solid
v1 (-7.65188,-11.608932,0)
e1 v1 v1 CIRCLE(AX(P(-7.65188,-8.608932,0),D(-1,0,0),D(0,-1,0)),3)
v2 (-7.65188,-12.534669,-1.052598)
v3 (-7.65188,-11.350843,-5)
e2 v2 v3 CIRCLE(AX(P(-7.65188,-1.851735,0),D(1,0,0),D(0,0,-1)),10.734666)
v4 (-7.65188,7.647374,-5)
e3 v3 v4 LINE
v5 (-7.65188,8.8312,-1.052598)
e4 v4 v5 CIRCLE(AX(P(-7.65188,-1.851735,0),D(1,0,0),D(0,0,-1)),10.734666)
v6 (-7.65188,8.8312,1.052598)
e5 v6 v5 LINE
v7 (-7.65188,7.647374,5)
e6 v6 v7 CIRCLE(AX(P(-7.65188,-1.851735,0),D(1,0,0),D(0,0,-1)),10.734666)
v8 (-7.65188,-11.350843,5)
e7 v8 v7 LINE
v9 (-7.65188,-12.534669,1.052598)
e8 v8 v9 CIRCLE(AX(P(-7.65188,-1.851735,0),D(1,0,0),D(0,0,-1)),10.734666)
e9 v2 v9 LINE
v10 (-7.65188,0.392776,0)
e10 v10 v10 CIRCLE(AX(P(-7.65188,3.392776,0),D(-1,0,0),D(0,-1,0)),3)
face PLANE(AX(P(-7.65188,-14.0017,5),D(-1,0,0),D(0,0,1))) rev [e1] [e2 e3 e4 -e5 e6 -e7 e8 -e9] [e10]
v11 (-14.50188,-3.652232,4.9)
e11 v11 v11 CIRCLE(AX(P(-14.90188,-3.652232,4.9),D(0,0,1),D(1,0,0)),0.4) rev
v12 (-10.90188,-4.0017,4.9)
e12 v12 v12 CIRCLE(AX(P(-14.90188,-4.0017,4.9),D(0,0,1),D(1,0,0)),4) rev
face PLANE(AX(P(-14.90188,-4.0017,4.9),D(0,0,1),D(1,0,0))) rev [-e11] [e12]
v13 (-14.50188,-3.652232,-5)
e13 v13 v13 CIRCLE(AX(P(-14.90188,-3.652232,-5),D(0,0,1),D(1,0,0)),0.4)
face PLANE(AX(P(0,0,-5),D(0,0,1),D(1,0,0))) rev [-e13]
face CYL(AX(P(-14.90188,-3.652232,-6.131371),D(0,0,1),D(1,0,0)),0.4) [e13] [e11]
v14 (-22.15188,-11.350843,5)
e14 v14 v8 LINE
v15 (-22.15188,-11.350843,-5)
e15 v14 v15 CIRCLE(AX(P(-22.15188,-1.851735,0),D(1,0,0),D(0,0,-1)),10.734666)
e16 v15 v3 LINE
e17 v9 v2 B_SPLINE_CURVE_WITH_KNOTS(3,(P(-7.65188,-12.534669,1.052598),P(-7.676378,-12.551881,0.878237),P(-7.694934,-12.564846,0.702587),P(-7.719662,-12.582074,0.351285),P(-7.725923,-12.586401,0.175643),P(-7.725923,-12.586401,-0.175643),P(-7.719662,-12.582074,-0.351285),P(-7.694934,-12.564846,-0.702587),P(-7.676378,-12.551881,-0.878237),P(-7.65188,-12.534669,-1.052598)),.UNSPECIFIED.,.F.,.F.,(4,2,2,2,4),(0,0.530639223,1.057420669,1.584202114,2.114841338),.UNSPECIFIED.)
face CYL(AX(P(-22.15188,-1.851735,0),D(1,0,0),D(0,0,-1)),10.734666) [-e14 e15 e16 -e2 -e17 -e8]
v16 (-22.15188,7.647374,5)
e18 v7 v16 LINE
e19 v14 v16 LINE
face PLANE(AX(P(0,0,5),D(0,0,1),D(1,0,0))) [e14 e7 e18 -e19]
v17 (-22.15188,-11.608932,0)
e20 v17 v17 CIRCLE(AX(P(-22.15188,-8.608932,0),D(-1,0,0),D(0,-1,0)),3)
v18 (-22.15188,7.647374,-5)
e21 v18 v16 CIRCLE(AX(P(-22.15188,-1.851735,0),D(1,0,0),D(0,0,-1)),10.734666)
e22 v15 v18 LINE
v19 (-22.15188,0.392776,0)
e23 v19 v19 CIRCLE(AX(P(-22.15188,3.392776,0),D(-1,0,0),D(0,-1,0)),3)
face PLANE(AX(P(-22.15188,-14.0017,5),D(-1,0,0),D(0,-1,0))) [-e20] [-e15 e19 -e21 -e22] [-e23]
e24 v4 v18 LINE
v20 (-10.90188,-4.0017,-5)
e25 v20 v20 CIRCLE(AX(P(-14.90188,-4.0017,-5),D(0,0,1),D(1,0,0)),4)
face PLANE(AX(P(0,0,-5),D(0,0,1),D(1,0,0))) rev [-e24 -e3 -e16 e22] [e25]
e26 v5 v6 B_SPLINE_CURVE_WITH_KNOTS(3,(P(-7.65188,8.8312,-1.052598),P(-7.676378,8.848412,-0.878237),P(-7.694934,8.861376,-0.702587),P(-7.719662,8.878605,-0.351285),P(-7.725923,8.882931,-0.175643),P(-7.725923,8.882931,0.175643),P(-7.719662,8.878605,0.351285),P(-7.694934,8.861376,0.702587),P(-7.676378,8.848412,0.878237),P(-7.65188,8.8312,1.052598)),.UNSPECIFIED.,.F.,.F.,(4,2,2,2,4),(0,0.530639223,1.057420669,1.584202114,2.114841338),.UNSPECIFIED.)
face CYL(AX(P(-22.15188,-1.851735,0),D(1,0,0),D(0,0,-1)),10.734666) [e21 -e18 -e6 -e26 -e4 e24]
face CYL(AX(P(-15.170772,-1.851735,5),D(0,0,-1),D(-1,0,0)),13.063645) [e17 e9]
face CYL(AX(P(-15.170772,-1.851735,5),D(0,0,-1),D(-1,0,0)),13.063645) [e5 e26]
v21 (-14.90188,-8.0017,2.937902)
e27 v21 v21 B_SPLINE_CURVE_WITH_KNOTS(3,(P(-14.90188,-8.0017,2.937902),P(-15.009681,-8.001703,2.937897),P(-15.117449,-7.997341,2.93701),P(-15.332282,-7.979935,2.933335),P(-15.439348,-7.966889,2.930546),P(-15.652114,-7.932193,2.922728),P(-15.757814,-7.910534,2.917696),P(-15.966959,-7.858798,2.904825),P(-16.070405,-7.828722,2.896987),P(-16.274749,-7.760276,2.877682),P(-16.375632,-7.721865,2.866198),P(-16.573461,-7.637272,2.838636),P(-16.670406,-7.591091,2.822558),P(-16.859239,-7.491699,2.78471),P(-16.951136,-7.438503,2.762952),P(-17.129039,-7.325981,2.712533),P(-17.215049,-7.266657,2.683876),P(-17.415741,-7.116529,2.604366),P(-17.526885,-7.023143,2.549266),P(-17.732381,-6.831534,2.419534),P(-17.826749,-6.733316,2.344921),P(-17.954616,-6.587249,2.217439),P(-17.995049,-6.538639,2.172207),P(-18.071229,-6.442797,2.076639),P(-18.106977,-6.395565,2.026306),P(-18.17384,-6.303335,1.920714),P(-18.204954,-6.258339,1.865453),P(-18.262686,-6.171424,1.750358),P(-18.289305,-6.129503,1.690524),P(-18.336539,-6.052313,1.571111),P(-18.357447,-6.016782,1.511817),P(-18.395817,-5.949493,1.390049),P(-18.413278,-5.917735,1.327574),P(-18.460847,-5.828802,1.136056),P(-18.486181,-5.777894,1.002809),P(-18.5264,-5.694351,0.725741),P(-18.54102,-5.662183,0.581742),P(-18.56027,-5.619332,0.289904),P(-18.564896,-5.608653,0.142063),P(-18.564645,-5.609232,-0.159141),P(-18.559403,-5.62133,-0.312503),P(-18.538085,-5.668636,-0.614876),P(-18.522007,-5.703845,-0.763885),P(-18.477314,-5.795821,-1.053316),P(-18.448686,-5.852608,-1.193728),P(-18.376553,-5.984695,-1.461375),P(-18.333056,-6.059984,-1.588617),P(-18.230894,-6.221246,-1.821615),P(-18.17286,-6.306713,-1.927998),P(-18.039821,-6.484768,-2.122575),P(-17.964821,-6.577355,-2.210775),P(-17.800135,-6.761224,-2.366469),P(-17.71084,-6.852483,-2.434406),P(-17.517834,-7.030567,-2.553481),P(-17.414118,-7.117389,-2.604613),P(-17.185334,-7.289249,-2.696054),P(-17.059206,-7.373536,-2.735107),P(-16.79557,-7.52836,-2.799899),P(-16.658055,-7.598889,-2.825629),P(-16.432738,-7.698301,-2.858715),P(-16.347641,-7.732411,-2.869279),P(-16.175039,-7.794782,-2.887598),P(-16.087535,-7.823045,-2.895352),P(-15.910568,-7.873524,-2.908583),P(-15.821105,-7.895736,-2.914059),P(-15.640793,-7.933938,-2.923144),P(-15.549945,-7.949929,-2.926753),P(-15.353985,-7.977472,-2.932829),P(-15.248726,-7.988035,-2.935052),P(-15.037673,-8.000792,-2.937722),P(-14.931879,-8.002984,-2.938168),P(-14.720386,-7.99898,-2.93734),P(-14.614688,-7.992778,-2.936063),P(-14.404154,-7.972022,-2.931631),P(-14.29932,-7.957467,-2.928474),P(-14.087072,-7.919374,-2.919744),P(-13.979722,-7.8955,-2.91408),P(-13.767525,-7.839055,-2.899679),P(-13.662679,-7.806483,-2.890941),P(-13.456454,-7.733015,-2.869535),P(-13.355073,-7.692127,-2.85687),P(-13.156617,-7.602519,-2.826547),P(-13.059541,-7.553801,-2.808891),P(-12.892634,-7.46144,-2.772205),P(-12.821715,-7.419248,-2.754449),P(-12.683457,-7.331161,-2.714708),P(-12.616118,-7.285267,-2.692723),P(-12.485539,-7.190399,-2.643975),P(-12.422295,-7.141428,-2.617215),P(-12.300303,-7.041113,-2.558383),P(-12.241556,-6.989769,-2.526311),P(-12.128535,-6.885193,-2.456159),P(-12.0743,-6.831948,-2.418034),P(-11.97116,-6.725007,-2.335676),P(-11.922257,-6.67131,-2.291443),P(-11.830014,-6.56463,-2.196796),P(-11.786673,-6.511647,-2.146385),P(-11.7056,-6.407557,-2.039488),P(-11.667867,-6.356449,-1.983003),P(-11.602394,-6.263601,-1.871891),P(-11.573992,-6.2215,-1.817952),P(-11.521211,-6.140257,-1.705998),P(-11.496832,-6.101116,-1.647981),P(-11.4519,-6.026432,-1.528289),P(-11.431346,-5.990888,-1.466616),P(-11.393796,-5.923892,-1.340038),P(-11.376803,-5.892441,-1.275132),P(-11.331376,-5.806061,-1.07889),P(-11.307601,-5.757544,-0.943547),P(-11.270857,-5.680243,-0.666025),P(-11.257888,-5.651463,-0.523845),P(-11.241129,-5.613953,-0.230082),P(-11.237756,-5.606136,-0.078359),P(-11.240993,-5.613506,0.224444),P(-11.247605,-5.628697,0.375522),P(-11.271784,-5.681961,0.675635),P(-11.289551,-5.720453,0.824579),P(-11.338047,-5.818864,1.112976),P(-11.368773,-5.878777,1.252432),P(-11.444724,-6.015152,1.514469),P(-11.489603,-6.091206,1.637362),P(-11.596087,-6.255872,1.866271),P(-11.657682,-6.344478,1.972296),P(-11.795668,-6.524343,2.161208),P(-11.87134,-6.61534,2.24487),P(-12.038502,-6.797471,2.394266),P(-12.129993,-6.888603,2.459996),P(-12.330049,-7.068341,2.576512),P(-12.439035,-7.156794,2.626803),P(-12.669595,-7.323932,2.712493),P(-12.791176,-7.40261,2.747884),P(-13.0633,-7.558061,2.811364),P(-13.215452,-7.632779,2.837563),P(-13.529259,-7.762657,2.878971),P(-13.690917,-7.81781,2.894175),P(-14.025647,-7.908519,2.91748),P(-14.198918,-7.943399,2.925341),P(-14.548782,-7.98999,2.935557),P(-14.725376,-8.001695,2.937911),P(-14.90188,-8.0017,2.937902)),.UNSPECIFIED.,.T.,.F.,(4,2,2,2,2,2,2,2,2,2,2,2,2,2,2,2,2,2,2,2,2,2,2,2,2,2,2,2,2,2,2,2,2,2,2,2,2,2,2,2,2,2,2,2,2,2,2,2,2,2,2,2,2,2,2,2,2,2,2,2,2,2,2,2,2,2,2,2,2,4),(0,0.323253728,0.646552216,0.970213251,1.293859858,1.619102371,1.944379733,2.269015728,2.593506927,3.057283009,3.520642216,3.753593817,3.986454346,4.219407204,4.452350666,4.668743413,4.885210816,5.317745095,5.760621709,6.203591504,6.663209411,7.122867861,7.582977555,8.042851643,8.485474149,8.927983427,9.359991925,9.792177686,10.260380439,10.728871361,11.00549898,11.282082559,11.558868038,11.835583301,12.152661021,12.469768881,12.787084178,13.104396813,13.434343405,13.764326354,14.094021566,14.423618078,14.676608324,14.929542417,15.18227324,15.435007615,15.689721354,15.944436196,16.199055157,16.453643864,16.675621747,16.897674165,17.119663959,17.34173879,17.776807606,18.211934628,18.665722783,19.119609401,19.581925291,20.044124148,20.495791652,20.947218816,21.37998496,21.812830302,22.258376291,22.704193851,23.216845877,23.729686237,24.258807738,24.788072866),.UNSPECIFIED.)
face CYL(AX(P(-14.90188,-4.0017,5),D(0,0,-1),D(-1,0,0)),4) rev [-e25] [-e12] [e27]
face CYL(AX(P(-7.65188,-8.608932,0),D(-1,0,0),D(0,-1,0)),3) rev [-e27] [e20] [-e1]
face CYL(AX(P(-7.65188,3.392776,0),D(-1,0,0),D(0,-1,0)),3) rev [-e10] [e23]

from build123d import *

# Parameters (mm, degrees)
SKETCH1_W               = 14.5
SKETCH1_H               = 30
SKETCH1_R               = 3
BOSS_EXTRUDE1_DEPTH     = 5
CUT_EXTRUDE1_DEPTH      = 30.097274604
CUT_EXTRUDE1_DEPTH_BACK = 30.097274604
SKETCH2_R               = 4
CUT_EXTRUDE2_DEPTH      = 23.16293341
CUT_EXTRUDE2_DEPTH_BACK = 23.16293341
SKETCH3_R               = 3
CUT_EXTRUDE3_DEPTH      = 23.162933498
CUT_EXTRUDE3_DEPTH_BACK = 23.162933498
SKETCH4_R               = 3
BOSS_EXTRUDE5_START     = -10
SKETCH6_R               = 5
BOSS_EXTRUDE5_DEPTH     = 0.1
SKETCH7_R               = 0.4
BOSS_EXTRUDE6_DEPTH     = 9.9
SKETCH8_W               = 10
SKETCH8_H               = 5.416493121
CUT_EXTRUDE5_DEPTH      = 23.162933498
CUT_EXTRUDE6_START      = -10
CUT_EXTRUDE6_DEPTH      = 10
CUT_EXTRUDE7_START      = -14.5
CUT_EXTRUDE7_DEPTH      = 14.5


# Read off the part's stored shape, not the designer's step: Cut-Extrude6, Cut-Extrude7
with BuildPart() as part:
    # Sketch1 → Boss-Extrude1 (new, symmetric)
    with BuildSketch(Plane.XY):
        with Locations((-14.901879651, 0.998300452)):
            Rectangle(SKETCH1_W, SKETCH1_H)
        with Locations((-14.901879651, -4.732232083)):
            Circle(SKETCH1_R, mode=Mode.SUBTRACT)
    extrude(amount=BOSS_EXTRUDE1_DEPTH, both=True)

    # Sketch2 → Cut-Extrude1 (cut, two sides: drawn at the far end of the back side and taken through both)
    with BuildSketch(Plane(origin=(0, 0, -5), x_dir=(-1, 0, 0), z_dir=(0, 0, -1)).offset(-CUT_EXTRUDE1_DEPTH_BACK)):
        with Locations((14.901879651, -4.001699548)):
            Circle(SKETCH2_R)
    extrude(amount=CUT_EXTRUDE1_DEPTH + CUT_EXTRUDE1_DEPTH_BACK, mode=Mode.SUBTRACT)

    # Sketch3 → Cut-Extrude2 (cut, two sides: drawn at the far end of the back side and taken through both)
    with BuildSketch(Plane.ZY.offset(22.151879651).offset(-CUT_EXTRUDE2_DEPTH_BACK)):
        with Locations(Location((0, -8.608931628, 0), (0, 0, 270))):
            Circle(SKETCH3_R)
    extrude(amount=CUT_EXTRUDE2_DEPTH + CUT_EXTRUDE2_DEPTH_BACK, mode=Mode.SUBTRACT)

    # Sketch4 → Cut-Extrude3 (cut, two sides: drawn at the far end of the back side and taken through both)
    with BuildSketch(Plane.ZY.offset(22.151879651).offset(-CUT_EXTRUDE3_DEPTH_BACK)):
        with Locations(Location((0, 3.392776132, 0), (0, 0, 270))):
            Circle(SKETCH4_R)
    extrude(amount=CUT_EXTRUDE3_DEPTH + CUT_EXTRUDE3_DEPTH_BACK, mode=Mode.SUBTRACT)

    # Sketch6 → Boss-Extrude5 (add)
    with BuildSketch(Plane(origin=(0, 0, -5), x_dir=(-1, 0, 0), z_dir=(0, 0, -1)).offset(BOSS_EXTRUDE5_START)):
        with Locations((14.901879651, -4.001699548)):
            Circle(SKETCH6_R)
    extrude(amount=BOSS_EXTRUDE5_DEPTH)

    # Sketch7 → Boss-Extrude6 (add)
    with BuildSketch(Plane(origin=(0, 0, 4.9), x_dir=(-1, 0, 0), z_dir=(0, 0, -1))):
        with Locations(Location((14.901879651, -3.652232083, 0), (0, 0, 180))):
            Circle(SKETCH7_R)
    extrude(amount=BOSS_EXTRUDE6_DEPTH)

    # Sketch8 → Cut-Extrude5 (cut, through all)
    with BuildSketch(Plane(origin=(-7.651879651, 0, 0), x_dir=(0, 0, -1), z_dir=(1, 0, 0))):
        with Locations((0, 13.290053892)):
            Rectangle(SKETCH8_W, SKETCH8_H)
    extrude(amount=-CUT_EXTRUDE5_DEPTH, mode=Mode.SUBTRACT)

    # Cut-Extrude6 outline → Cut-Extrude6 (cut)
    with BuildSketch(Plane(origin=(0, 0, -5), x_dir=(-1, 0, 0), z_dir=(0, 0, -1)).offset(CUT_EXTRUDE6_START)):
        with BuildLine():
            ThreePointArc((7.651879651, 8.831200001), (9.341126693, 9.839033909), (11.162547128, 10.581807331))
            Line((11.162547128, 10.581807331), (7.651879651, 10.581807331))
            Line((7.651879651, 10.581807331), (7.651879651, 8.831200001))
        make_face()
        with BuildLine():
            Line((22.151879651, 10.581807331), (19.178996312, 10.581807331))
            ThreePointArc((19.178996312, 10.581807331), (20.709322329, 9.979718674), (22.151879651, 9.190138504))
            Line((22.151879651, 9.190138504), (22.151879651, 10.581807331))
        make_face()
        with BuildLine():
            ThreePointArc((10.371064905, -14.001699548), (8.967948653, -13.348856833), (7.651879651, -12.534669381))
            Line((7.651879651, -12.534669381), (7.651879651, -14.001699548))
            Line((7.651879651, -14.001699548), (10.371064905, -14.001699548))
        make_face()
        with BuildLine():
            Line((22.151879651, -14.001699548), (22.151879651, -12.893607884))
            ThreePointArc((22.151879651, -12.893607884), (21.087178214, -13.498835864), (19.970478535, -14.001699548))
            Line((19.970478535, -14.001699548), (22.151879651, -14.001699548))
        make_face()
    extrude(amount=CUT_EXTRUDE6_DEPTH, mode=Mode.SUBTRACT)

    # Cut-Extrude7 outline → Cut-Extrude7 (cut)
    with BuildSketch(Plane(origin=(-7.651879651, 0, 0), x_dir=(0, 0, -1), z_dir=(1, 0, 0)).offset(CUT_EXTRUDE7_START)):
        with BuildLine():
            ThreePointArc((5, -11.350842885), (0, -12.5864008), (-5, -11.350842885))
            Line((-5, -11.350842885), (-5, -14.001699548))
            Line((-5, -14.001699548), (5, -14.001699548))
            Line((5, -14.001699548), (5, -11.350842885))
        make_face()
        with BuildLine():
            Line((-5, 10.581807331), (-5, 7.647373505))
            ThreePointArc((-5, 7.647373505), (0, 8.882931421), (5, 7.647373505))
            Line((5, 7.647373505), (5, 10.581807331))
            Line((5, 10.581807331), (-5, 10.581807331))
        make_face()
    extrude(amount=CUT_EXTRUDE7_DEPTH, mode=Mode.SUBTRACT)


solid = part.part
